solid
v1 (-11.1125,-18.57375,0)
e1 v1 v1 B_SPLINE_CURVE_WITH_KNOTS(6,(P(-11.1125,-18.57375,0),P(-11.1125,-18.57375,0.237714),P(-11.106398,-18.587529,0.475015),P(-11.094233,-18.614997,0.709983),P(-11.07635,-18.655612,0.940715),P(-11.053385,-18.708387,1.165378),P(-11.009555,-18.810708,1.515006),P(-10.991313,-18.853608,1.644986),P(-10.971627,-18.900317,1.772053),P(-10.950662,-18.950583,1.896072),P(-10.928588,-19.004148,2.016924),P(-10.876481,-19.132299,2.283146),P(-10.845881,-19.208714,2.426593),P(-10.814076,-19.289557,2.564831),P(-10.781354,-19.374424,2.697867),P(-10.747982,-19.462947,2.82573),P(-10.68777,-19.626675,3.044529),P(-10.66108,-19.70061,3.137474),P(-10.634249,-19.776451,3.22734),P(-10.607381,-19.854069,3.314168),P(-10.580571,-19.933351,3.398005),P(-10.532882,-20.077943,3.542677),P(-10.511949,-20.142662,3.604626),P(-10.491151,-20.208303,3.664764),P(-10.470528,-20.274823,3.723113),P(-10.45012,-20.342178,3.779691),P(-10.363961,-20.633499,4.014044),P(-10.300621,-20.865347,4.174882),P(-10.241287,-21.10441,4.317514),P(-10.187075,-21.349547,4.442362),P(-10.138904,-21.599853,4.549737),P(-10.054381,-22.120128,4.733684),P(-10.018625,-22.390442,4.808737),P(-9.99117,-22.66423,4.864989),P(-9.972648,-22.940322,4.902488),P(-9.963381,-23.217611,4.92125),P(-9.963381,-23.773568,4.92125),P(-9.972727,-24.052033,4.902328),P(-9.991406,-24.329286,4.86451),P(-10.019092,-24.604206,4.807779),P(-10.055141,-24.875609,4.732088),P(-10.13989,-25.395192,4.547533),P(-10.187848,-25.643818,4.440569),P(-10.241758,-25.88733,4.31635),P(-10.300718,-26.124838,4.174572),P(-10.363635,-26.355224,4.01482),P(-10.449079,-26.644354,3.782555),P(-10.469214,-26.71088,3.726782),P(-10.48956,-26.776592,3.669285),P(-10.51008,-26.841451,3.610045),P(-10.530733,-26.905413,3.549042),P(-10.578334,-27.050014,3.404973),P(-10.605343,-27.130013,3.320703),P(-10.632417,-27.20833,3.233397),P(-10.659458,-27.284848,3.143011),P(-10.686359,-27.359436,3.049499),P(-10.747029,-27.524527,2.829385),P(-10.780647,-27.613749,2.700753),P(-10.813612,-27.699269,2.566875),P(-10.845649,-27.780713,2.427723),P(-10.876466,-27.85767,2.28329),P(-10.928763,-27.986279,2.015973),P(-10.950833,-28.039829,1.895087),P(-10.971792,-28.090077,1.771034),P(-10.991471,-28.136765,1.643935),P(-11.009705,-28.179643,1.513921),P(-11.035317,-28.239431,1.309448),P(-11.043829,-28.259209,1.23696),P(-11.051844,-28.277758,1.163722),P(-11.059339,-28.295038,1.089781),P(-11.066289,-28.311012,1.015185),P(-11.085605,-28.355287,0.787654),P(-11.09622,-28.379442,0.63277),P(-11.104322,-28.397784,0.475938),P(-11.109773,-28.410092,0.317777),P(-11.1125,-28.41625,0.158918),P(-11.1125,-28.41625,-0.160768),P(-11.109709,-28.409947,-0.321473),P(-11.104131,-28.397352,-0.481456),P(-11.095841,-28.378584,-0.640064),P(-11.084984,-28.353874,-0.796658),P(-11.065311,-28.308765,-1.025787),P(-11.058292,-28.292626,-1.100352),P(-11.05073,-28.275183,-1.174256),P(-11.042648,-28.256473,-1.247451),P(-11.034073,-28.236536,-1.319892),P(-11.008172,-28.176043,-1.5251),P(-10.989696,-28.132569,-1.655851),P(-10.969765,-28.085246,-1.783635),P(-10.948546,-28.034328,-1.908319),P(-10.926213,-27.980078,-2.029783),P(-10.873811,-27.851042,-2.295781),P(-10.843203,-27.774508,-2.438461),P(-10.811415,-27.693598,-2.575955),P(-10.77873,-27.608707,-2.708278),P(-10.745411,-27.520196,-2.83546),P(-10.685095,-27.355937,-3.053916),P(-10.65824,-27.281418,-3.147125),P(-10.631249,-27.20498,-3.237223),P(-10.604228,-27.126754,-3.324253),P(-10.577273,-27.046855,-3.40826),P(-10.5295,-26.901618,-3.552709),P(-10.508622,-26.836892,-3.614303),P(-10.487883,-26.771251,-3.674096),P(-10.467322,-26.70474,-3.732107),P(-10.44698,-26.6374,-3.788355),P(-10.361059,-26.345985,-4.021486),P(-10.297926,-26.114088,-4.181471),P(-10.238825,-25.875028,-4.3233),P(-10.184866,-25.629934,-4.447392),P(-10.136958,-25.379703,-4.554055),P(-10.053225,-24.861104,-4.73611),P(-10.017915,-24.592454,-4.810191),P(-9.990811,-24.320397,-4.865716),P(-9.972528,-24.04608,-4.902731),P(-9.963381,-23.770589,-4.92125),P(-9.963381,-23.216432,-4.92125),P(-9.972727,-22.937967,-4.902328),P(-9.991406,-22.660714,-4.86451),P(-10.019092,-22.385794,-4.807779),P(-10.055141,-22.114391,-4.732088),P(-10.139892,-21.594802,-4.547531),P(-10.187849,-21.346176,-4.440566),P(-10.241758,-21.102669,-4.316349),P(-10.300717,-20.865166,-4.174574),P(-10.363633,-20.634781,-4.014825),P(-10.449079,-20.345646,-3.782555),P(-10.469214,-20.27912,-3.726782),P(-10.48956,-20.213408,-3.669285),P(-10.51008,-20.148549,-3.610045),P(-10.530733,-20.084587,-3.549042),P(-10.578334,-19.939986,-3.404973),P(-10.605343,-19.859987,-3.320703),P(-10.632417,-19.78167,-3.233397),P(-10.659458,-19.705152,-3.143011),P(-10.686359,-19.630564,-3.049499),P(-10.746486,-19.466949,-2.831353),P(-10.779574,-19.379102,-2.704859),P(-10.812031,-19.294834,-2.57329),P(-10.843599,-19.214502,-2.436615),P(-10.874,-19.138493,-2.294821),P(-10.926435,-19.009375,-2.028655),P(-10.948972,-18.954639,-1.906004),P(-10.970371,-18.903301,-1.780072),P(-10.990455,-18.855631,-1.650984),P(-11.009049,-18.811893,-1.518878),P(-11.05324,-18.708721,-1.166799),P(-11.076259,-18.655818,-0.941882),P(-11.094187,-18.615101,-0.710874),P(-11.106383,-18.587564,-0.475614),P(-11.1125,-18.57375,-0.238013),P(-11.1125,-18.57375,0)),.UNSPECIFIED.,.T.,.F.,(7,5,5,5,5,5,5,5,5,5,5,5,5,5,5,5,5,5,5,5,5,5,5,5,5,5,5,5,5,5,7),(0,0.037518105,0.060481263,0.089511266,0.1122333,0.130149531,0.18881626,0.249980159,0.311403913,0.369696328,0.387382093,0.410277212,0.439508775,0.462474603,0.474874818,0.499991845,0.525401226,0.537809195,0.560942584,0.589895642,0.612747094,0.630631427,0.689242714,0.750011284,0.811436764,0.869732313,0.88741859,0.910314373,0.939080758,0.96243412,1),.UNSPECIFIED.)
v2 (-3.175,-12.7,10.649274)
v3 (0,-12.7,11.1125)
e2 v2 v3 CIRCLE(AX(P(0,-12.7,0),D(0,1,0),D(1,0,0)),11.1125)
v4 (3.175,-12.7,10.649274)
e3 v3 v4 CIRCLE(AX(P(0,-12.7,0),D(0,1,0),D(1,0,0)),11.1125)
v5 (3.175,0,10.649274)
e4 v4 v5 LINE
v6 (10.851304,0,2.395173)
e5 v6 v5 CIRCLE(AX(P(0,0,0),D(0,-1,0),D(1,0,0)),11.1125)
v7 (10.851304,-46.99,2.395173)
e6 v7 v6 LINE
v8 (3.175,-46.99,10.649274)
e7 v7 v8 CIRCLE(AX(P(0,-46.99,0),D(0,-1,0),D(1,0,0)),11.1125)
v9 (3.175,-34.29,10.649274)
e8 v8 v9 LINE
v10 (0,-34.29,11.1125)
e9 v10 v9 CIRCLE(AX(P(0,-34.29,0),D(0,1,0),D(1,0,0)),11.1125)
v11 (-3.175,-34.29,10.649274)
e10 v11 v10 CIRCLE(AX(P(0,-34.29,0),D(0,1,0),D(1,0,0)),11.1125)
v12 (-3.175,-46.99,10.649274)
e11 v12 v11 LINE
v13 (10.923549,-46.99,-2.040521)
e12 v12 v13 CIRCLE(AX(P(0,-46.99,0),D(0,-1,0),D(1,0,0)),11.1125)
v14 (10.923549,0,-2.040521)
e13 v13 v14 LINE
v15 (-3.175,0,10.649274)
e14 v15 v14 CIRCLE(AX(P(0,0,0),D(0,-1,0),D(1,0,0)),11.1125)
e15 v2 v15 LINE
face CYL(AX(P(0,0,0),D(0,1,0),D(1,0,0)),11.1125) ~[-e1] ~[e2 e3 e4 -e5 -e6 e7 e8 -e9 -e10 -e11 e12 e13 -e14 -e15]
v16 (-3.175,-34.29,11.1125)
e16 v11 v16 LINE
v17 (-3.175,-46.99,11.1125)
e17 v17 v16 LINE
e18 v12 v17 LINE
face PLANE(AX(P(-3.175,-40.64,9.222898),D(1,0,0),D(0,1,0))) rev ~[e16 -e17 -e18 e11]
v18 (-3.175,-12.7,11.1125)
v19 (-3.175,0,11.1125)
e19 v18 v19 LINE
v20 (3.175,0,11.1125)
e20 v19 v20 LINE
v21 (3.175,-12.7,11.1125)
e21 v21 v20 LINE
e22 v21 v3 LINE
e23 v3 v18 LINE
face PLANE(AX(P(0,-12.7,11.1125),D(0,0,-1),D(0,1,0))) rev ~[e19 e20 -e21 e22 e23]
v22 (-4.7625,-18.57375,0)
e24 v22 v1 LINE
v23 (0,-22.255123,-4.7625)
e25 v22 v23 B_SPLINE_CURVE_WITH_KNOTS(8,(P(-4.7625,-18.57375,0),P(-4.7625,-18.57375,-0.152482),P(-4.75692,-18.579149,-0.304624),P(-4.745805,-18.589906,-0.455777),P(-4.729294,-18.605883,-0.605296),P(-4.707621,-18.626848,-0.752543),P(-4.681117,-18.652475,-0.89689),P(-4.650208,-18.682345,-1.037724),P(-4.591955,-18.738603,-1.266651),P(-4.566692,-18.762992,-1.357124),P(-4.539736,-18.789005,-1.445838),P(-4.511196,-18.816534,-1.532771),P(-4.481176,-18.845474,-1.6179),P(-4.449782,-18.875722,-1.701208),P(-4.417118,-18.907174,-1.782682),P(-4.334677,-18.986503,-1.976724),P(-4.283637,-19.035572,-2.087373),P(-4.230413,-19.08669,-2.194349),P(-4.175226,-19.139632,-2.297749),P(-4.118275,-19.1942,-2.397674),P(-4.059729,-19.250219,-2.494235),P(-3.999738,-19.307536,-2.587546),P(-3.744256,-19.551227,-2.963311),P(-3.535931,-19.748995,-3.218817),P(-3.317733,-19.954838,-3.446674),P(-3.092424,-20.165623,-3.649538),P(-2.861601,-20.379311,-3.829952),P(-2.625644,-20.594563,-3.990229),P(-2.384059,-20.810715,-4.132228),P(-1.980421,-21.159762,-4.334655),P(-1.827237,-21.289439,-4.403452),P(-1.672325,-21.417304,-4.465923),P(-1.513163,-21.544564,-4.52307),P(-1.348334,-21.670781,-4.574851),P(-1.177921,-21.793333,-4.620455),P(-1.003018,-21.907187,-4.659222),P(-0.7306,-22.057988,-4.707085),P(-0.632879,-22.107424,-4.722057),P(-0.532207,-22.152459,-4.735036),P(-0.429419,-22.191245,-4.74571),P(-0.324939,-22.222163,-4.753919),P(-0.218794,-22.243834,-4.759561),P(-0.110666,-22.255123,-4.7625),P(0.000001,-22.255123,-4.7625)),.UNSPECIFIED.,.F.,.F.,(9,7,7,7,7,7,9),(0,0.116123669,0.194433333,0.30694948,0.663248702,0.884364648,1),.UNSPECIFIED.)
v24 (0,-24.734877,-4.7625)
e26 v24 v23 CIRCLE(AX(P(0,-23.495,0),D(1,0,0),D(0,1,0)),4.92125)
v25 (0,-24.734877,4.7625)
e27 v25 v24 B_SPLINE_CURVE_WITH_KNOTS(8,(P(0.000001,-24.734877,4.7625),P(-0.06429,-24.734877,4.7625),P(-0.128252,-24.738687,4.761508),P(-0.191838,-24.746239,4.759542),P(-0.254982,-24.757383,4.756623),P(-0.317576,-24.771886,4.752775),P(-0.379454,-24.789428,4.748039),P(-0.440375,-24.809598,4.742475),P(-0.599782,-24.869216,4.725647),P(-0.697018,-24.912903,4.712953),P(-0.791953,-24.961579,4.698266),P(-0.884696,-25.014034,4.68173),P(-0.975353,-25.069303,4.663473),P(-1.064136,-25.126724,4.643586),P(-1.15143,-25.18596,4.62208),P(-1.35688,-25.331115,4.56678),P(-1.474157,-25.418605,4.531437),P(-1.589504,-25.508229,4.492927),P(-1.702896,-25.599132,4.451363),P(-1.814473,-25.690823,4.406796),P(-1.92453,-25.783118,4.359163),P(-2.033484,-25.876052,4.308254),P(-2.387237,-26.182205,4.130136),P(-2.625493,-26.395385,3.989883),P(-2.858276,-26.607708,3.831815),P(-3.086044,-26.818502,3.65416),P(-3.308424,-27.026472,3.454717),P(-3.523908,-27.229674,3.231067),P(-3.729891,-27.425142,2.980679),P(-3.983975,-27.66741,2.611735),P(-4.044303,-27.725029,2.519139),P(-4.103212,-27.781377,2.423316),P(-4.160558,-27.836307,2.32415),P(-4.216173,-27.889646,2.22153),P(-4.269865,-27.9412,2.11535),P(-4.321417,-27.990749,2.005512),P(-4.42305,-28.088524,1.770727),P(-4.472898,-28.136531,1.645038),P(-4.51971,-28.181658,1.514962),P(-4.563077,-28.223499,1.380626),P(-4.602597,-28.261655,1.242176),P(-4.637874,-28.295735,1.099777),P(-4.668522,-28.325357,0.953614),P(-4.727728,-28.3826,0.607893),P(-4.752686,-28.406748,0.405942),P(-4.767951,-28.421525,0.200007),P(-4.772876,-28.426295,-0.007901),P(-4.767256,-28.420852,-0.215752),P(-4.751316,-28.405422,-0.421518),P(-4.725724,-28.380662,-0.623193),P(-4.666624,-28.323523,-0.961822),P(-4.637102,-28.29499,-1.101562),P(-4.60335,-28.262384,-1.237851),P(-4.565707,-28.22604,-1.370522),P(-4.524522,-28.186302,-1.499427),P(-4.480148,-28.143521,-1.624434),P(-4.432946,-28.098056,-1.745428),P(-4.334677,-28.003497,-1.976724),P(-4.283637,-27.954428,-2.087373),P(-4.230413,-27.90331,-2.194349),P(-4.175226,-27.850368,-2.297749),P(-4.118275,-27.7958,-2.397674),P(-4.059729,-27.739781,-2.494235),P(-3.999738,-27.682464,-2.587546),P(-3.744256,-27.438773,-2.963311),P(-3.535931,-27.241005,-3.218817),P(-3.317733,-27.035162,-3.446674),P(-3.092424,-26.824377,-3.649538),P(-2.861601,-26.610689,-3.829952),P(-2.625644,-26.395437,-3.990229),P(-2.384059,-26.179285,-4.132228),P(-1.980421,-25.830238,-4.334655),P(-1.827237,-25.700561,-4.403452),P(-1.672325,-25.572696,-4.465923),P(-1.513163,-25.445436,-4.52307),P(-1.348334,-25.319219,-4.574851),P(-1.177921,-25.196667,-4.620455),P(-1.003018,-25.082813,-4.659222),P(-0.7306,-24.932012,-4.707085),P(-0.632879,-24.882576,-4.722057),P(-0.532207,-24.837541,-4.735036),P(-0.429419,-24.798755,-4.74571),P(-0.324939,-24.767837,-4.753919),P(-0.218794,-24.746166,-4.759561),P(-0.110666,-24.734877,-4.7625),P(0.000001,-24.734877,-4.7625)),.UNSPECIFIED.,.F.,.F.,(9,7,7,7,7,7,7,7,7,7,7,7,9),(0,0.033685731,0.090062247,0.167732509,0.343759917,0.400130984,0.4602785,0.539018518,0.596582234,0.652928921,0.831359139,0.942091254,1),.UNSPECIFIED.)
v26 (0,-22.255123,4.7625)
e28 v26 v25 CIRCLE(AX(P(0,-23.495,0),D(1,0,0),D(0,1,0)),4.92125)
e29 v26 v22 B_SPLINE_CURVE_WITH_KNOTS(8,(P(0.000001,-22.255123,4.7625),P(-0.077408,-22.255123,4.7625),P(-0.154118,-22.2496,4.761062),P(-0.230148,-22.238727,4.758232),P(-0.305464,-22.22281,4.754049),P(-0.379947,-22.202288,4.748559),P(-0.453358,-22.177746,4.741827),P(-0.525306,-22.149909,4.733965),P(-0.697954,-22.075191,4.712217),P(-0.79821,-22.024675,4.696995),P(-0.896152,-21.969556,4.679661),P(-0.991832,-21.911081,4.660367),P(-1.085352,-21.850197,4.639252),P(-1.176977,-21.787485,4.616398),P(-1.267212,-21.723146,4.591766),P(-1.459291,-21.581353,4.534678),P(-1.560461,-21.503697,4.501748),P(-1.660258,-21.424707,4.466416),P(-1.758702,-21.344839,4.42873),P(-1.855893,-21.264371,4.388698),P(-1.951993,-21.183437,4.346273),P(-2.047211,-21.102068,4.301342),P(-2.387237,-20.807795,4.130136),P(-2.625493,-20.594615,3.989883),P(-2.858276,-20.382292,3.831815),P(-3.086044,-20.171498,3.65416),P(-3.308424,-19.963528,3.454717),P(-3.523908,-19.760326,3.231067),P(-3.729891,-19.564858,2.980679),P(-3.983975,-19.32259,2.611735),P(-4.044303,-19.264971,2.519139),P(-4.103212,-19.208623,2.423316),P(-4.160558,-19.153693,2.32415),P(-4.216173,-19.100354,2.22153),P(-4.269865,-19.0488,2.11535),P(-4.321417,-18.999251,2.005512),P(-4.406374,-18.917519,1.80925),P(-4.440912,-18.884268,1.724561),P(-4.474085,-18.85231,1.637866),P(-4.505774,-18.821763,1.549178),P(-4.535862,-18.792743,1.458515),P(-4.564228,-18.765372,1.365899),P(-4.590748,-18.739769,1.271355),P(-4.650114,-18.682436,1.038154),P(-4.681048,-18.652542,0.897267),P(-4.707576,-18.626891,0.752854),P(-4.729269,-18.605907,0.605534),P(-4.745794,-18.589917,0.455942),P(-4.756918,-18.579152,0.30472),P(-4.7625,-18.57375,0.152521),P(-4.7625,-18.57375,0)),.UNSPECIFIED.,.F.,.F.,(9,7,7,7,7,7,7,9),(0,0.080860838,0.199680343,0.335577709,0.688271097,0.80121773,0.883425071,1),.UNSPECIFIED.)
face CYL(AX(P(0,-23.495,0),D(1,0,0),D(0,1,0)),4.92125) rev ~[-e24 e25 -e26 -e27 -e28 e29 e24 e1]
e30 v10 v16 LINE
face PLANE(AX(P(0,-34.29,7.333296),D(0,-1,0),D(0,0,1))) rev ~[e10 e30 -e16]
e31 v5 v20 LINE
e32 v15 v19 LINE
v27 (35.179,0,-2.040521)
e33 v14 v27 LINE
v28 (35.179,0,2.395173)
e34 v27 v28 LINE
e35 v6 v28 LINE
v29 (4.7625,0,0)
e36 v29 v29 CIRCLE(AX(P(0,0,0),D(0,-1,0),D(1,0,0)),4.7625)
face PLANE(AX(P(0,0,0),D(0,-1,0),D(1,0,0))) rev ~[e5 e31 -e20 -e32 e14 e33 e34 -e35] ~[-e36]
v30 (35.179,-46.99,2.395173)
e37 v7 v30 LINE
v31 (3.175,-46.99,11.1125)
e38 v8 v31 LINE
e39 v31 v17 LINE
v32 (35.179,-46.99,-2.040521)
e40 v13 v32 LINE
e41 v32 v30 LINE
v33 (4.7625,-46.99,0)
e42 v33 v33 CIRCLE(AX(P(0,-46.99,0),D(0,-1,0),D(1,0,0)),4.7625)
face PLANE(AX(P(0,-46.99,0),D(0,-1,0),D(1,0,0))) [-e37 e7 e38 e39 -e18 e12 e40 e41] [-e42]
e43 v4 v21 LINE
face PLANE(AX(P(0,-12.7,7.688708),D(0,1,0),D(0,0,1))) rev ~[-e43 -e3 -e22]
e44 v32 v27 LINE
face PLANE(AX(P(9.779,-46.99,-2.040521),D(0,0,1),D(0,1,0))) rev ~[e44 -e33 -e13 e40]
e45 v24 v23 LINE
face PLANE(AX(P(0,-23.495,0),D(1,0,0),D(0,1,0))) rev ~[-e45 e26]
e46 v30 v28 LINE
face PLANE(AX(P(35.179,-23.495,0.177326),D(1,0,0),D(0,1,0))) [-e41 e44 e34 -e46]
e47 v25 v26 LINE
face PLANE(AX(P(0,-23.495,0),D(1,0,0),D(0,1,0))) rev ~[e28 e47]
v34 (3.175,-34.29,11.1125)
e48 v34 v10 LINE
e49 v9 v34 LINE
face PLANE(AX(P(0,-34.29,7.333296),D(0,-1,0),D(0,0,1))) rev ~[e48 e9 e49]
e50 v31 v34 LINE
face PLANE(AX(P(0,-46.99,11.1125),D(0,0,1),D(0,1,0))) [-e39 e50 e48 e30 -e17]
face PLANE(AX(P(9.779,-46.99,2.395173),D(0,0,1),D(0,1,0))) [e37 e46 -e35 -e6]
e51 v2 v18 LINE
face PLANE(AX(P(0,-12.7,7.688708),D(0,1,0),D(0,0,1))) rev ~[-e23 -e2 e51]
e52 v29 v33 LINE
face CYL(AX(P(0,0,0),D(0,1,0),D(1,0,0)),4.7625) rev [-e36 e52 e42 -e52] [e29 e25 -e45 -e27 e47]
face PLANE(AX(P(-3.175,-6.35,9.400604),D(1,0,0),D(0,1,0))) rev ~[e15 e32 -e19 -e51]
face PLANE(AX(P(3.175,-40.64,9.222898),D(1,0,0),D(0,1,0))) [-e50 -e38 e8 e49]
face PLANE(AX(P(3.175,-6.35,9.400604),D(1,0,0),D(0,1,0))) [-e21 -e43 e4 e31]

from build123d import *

# Parameters (mm, degrees)
F0_R     = 11.1125
F0_R_2   = 4.7625
F1_DEPTH = 46.99
F2_W     = 12.7
F2_H     = 3.7792036489
F2_H_2   = 3.4237923279
F3_DEPTH = 3.175
F5_W     = 46.99
F5_H     = 4.4356931467
F6_DEPTH = 25.4
F7_R     = 4.92125
F8_DEPTH = 25.4


# Not quite as in the source:
# - a feature names something its author has since deleted; it is built from what else it names


with BuildPart() as f1:
    # F0 (on Front) → F1 (new body)
    with BuildSketch(Plane.XZ):
        Circle(F0_R)
        Circle(F0_R_2, mode=Mode.SUBTRACT)
    extrude(amount=F1_DEPTH)

    # F2 (on Right) → F3 (join, symmetric)
    with BuildSketch(Plane.YZ):
        with Locations((-40.64, 9.2228981756)):
            Rectangle(F2_W, F2_H)
        with Locations((-6.35, 9.400603836)):
            Rectangle(F2_W, F2_H_2)
    extrude(amount=F3_DEPTH, both=True)

    # F5 (on offset) → F6 (join)
    with BuildSketch(Plane.YZ.offset(9.779)):
        with Locations((-23.495, 0.1773260301)):
            Rectangle(F5_W, F5_H)
    extrude(amount=F6_DEPTH)

    # F7 (on Right) → F8 (cut)
    with BuildSketch(Plane.YZ):
        with Locations((-23.495, 0)):
            Circle(F7_R)
    extrude(amount=-F8_DEPTH, mode=Mode.SUBTRACT)


solid = f1.part
